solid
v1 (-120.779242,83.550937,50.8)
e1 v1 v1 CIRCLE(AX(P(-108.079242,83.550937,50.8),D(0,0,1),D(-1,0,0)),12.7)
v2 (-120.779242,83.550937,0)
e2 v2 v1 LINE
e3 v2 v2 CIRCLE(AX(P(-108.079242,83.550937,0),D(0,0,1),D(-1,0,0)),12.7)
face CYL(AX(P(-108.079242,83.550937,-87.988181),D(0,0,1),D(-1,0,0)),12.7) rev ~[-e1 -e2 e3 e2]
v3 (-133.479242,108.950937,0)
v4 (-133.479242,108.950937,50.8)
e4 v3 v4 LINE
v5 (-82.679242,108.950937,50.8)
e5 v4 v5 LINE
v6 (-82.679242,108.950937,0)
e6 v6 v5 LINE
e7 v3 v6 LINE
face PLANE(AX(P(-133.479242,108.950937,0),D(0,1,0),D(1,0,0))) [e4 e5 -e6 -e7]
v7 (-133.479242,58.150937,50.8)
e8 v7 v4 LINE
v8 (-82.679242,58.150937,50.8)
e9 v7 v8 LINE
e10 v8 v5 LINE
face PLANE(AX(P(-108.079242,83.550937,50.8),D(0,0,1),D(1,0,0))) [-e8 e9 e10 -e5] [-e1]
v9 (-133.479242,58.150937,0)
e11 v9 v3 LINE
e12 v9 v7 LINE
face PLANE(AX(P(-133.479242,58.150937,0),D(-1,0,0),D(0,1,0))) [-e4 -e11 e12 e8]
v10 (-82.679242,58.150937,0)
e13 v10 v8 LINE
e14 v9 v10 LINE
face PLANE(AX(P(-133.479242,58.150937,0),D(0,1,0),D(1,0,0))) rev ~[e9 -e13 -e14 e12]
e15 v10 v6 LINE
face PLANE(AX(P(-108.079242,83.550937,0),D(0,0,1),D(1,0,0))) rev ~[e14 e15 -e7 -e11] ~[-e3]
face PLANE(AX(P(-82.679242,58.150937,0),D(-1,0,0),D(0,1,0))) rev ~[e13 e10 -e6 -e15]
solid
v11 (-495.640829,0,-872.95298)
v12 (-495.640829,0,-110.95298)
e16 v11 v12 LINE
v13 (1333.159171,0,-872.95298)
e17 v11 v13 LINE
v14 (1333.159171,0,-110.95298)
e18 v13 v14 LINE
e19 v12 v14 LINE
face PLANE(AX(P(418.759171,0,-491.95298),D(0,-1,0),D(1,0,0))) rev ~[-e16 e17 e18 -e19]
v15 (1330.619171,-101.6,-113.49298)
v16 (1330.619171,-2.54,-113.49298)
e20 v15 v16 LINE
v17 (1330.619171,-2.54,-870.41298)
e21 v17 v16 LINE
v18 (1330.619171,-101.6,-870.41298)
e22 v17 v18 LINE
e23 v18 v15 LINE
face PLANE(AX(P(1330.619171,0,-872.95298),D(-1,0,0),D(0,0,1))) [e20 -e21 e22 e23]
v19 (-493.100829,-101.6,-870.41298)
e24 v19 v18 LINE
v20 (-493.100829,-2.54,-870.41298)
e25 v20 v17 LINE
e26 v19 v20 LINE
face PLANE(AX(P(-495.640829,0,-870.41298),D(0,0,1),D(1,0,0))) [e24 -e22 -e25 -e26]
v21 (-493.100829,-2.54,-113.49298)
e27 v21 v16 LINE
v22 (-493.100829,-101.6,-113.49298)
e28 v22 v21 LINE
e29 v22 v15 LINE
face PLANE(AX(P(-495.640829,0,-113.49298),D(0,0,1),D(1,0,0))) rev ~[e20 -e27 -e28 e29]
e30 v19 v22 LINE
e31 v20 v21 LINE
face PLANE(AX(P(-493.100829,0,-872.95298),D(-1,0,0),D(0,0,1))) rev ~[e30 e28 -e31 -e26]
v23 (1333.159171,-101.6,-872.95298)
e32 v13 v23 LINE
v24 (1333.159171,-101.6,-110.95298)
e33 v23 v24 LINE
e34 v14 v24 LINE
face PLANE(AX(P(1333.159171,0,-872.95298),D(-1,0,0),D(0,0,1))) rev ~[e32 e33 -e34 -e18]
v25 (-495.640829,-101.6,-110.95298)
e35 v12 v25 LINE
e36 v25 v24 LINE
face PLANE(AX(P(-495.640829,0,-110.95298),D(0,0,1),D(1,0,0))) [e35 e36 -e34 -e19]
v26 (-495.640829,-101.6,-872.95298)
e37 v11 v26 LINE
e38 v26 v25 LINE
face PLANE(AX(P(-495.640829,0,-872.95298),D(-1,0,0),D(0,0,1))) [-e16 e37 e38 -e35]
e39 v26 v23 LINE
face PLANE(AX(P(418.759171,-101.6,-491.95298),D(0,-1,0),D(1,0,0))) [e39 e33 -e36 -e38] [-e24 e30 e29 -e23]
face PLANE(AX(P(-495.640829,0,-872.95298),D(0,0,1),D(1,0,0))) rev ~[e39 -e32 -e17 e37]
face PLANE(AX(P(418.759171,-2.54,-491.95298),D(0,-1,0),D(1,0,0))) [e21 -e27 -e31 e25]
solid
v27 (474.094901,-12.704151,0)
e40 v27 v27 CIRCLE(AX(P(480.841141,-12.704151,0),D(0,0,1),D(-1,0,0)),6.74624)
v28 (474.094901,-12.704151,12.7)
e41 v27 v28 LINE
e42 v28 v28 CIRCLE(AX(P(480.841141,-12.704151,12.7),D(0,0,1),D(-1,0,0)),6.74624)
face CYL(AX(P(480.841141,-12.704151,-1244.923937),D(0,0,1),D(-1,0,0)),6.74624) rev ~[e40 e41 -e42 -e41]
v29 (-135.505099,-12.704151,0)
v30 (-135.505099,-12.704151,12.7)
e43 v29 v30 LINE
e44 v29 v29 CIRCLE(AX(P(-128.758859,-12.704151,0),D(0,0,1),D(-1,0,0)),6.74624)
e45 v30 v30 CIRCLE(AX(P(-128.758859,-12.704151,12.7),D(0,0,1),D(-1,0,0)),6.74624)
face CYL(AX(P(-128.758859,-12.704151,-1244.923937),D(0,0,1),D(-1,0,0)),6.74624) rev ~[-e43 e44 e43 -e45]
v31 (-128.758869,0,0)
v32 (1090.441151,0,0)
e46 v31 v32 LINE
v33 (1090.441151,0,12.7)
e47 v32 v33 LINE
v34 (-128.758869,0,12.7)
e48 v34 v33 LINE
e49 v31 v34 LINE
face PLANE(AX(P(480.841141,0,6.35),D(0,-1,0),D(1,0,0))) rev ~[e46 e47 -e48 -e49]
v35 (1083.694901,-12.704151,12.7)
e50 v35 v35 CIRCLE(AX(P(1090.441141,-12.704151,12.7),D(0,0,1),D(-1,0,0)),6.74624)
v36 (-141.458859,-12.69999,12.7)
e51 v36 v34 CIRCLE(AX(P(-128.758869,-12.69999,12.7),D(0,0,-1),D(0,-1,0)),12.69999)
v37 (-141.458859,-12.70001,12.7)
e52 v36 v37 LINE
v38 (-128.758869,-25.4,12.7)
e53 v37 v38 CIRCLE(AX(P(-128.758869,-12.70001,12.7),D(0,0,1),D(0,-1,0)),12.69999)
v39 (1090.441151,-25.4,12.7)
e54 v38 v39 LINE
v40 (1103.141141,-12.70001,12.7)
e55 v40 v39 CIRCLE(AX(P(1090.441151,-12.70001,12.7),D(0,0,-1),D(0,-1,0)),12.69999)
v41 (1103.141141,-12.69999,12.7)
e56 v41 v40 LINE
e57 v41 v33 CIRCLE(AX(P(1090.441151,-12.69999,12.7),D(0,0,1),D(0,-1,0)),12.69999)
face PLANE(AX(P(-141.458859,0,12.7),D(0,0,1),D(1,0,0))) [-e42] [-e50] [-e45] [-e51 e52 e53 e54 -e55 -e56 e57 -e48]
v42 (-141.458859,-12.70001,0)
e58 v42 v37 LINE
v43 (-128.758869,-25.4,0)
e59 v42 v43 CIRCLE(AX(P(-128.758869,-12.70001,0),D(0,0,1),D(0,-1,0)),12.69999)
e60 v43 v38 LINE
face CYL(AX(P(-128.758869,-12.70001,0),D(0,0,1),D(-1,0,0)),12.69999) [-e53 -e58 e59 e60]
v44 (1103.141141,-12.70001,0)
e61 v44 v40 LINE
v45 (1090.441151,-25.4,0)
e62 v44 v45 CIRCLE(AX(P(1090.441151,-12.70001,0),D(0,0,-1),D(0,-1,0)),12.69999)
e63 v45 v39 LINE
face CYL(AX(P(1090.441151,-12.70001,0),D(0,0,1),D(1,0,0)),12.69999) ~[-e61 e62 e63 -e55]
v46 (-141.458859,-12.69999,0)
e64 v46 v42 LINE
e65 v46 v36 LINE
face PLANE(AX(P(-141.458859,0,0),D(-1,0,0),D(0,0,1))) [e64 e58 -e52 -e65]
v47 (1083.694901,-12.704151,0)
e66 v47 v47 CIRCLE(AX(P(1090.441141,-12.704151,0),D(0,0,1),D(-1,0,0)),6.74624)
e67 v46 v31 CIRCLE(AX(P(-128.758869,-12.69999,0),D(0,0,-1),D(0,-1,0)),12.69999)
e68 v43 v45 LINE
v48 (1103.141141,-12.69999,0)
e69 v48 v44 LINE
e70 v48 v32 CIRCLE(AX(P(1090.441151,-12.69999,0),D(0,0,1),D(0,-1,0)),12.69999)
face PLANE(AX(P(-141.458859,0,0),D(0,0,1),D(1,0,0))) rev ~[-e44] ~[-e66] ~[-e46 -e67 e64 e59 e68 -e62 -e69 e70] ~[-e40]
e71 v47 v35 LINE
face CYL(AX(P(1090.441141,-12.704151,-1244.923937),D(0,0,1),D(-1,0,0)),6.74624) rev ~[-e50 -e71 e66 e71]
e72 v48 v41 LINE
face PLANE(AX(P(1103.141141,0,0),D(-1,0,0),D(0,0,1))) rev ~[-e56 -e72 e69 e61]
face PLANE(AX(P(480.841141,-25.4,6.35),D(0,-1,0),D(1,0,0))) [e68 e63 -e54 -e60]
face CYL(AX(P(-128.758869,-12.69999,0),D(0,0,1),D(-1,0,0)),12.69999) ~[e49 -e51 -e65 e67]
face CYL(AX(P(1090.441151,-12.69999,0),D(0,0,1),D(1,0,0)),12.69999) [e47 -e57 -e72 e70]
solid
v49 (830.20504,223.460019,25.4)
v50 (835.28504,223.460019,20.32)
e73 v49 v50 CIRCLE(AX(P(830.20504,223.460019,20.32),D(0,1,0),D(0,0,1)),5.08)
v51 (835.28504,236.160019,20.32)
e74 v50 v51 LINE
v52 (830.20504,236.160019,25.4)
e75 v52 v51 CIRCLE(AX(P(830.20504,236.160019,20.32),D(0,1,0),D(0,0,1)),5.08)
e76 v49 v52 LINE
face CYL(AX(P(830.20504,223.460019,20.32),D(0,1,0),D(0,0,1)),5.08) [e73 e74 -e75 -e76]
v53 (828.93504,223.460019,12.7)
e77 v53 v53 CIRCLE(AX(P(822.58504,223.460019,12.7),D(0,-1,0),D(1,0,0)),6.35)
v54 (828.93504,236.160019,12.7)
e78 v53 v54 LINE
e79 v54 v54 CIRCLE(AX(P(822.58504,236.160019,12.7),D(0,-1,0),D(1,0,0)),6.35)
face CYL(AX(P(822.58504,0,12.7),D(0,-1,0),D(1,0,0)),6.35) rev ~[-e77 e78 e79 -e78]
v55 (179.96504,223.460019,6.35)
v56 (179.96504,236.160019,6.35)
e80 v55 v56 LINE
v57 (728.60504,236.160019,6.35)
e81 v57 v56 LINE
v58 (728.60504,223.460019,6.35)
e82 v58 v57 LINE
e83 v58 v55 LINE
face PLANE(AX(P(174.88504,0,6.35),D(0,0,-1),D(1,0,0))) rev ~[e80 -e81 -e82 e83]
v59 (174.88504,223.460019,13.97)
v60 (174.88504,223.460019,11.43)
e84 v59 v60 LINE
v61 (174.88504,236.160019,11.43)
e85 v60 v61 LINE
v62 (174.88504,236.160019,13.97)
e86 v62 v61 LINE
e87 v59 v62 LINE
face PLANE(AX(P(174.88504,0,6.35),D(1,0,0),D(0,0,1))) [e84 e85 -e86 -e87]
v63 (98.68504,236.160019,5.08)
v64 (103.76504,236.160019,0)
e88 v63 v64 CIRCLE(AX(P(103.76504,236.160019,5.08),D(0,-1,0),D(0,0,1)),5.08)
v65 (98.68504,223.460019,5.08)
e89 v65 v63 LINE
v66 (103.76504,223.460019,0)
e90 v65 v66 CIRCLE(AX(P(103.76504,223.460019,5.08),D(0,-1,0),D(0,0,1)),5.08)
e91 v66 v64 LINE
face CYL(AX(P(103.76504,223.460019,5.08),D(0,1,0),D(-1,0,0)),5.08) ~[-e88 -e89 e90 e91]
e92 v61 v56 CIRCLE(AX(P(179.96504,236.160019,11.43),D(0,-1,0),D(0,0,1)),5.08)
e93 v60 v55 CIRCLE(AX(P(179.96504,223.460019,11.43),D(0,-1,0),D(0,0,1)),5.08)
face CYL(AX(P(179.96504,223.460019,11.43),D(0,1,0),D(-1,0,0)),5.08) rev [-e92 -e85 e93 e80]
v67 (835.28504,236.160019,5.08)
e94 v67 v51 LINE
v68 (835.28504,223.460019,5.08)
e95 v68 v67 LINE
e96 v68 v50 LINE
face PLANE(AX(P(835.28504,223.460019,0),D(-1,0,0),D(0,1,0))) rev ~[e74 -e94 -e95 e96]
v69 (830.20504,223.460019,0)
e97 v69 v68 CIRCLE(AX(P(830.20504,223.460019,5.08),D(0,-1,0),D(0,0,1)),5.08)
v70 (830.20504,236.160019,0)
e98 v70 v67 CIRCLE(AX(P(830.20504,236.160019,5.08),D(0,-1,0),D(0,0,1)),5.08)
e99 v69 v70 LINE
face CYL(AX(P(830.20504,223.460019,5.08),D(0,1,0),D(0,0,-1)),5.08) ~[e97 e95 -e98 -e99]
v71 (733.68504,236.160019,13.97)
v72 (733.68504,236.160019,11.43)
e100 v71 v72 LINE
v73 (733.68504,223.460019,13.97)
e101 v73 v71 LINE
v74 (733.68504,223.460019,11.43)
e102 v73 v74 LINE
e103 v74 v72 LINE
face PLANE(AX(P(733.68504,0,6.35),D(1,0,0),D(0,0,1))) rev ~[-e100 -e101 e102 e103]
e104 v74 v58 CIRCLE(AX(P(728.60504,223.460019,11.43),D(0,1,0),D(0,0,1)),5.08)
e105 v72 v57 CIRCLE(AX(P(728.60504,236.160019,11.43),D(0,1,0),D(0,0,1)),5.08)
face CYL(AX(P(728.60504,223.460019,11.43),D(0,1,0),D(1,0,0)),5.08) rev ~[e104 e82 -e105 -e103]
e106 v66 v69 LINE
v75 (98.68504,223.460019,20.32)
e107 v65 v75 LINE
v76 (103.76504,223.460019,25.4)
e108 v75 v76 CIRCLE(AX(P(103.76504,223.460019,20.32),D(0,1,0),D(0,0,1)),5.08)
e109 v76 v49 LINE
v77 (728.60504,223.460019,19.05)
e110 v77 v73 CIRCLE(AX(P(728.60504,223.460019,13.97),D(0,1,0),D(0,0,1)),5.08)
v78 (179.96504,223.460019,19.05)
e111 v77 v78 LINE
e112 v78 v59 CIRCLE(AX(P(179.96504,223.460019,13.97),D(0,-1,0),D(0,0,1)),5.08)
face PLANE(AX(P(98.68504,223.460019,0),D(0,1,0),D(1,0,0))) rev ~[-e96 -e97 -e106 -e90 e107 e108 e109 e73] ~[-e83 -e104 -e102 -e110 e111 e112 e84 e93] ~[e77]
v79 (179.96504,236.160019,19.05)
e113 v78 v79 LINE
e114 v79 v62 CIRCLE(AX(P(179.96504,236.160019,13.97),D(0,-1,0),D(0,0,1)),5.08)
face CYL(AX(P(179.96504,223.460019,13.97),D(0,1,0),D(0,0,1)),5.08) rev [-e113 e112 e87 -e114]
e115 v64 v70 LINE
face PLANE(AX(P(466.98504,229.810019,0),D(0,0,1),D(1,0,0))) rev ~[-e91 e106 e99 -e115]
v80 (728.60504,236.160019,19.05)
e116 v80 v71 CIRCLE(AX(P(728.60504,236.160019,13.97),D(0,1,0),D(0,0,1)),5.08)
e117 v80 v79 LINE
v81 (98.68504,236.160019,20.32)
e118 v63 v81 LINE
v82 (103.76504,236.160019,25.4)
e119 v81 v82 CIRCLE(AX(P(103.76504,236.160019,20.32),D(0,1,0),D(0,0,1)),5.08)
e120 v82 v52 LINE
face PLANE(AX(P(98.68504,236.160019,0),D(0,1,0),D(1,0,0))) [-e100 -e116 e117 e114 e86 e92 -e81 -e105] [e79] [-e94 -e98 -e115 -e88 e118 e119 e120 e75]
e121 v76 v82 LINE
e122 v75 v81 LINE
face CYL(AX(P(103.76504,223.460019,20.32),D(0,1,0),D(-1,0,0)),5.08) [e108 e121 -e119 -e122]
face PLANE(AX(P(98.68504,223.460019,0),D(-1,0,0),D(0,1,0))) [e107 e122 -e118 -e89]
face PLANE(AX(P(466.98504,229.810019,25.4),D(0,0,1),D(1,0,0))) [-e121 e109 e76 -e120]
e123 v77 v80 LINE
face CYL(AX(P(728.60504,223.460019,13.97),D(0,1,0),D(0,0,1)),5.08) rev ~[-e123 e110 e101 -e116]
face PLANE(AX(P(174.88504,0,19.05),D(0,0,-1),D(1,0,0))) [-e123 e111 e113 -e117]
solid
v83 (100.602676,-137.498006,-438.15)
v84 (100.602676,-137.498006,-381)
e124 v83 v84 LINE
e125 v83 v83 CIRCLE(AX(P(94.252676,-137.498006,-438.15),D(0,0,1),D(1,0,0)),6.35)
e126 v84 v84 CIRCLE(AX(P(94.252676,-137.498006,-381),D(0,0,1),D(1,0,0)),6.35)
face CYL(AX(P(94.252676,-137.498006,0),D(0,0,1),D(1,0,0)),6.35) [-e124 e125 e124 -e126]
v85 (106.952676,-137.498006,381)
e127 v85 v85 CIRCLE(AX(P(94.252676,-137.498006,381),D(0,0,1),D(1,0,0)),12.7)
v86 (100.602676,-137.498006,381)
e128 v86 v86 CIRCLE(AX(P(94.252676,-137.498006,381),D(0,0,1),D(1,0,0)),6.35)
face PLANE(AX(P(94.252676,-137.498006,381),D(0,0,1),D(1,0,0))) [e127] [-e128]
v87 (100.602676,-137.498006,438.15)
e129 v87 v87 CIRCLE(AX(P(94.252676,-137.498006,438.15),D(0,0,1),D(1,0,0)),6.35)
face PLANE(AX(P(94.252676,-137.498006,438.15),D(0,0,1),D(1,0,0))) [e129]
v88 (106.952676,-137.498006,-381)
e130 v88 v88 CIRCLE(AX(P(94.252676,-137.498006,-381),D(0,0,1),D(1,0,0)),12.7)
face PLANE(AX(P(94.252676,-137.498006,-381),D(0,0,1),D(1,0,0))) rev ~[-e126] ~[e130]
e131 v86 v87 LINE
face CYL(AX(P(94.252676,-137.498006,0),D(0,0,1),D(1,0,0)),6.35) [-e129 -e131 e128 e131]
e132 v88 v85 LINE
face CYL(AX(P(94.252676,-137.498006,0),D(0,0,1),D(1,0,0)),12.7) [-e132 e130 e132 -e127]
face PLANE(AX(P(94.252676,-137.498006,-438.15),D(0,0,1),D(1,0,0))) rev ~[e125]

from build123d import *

# Parameters (mm, degrees)
F0_W      = 1244.6
F0_H      = 12.7
F1_DEPTH  = 25.4
F2_R      = 12.69999
F4_D      = 13.49248
F5_R      = 6.35
F6_DEPTH  = 438.15
F5_R_2    = 12.7
F7_DEPTH  = 381
F8_W      = 50.8
F8_H      = 50.8
F9_DEPTH  = 50.8
F11_D     = 25.4
F12_W     = 736.6
F12_H     = 12.7
F13_DEPTH = 25.4
F14_W     = 558.8
F14_H     = 12.7
F15_DEPTH = 236.1610186348
F14_R     = 6.35
F17_R     = 5.08
F18_W     = 1828.8
F18_H     = 762
F19_DEPTH = 101.6
F20_T     = -2.54


# Not quite as in the source:
# - a fillet or chamfer is up to 0.001 mm smaller than in the source, because OpenCascade refuses the exact size


with BuildPart() as f1:
    # F0 (on Front) → F1 (new body)
    with BuildSketch(Plane.XZ):
        with Locations((480.8411406559, 6.35)):
            Rectangle(F0_W, F0_H)
    extrude(amount=F1_DEPTH)

    # F2 (radius 12.7 in the source; OpenCascade refuses exactly that, so slightly less here)
    f2_edges = [f1.edges().sort_by_distance(p)[0] for p in [
        (-141.458859, -25.4, 6.35),
        (1103.141141, -25.4, 6.35),
        (1103.141141, 0, 6.35),
        (-141.458859, 0, 6.35),
    ]]
    fillet(f2_edges, radius=F2_R)

    # F4 (through all)
    with Locations(Plane(origin=(0, 0, 0), x_dir=(1, 0, 0), z_dir=(0, 0, -1))):
        with Locations((480.8411406559, 12.7041507512), (1090.4411406559, 12.7041507512), (-128.7588593441, 12.7041507512)):
            Hole(F4_D / 2)


with BuildPart() as f6:
    # F5 (on Top) → F6 (new body, symmetric)
    with BuildSketch(Plane.XY):
        with Locations((94.2526757717, -137.4980062246)):
            Circle(F5_R)
    extrude(amount=F6_DEPTH, both=True)

    # F5 (on Top) → F7 (join, symmetric)
    with BuildSketch(Plane.XY):
        with Locations((94.2526757717, -137.4980062246)):
            Circle(F5_R_2)
        with Locations((94.2526757717, -137.4980062246)):
            Circle(F5_R, mode=Mode.SUBTRACT)
    extrude(amount=F7_DEPTH, both=True)


with BuildPart() as f9:
    # F8 (on Top) → F9 (new body)
    with BuildSketch(Plane.XY):
        with Locations((-108.0792423666, 83.5509366974)):
            Rectangle(F8_W, F8_H)
    extrude(amount=F9_DEPTH)

    # F11 (through all)
    with Locations(Plane(origin=(0, 0, 0), x_dir=(1, 0, 0), z_dir=(0, 0, -1))):
        with Locations((-108.0792423666, -83.5509366974)):
            Hole(F11_D / 2)


with BuildPart() as f13:
    # F12 (on Top) → F13 (new body)
    with BuildSketch(Plane.XY):
        with Locations((466.9850397587, 229.8100186348)):
            Rectangle(F12_W, F12_H)
    extrude(amount=F13_DEPTH)


with BuildPart() as f15:
    # F14 (on Front) → F15 (new body, through all)
    with BuildSketch(Plane.XZ):
        with Locations((454.2850397587, 12.7)):
            Rectangle(F14_W, F14_H)
    extrude(amount=-F15_DEPTH)


with BuildPart() as f15b:
    # F14 (on Front) → F15, piece 2 (new body, through all)
    with BuildSketch(Plane.XZ):
        with Locations((822.5850397587, 12.7)):
            Circle(F14_R)
    extrude(amount=-F15_DEPTH)


with BuildPart() as f13_1:
    add(f13.part)

    # F16: cut F15, F15b
    add(f15.part, mode=Mode.SUBTRACT)
    add(f15b.part, mode=Mode.SUBTRACT)

    # F17
    f17_edges = [f13_1.edges().sort_by_distance(p)[0] for p in [
        (98.68504, 229.810019, 25.4),
        (835.28504, 229.810019, 25.4),
        (733.68504, 229.810019, 6.35),
        (174.88504, 229.810019, 6.35),
        (174.88504, 229.810019, 19.05),
        (98.68504, 229.810019, 0),
        (835.28504, 229.810019, 0),
        (733.68504, 229.810019, 19.05),
    ]]
    fillet(f17_edges, radius=F17_R)


with BuildPart() as f19:
    # F18 (on Front) → F19 (new body)
    with BuildSketch(Plane.XZ):
        with Locations((418.7591709614, -491.9529797588)):
            Rectangle(F18_W, F18_H)
    extrude(amount=F19_DEPTH)

    # F20
    f20_openings = [f19.faces().sort_by_distance(p)[0] for p in [
        (418.759171, -101.6, -491.95298),
    ]]
    offset(amount=F20_T, openings=f20_openings)


solid = Compound([f1.part, f6.part, f9.part, f13_1.part, f19.part])
